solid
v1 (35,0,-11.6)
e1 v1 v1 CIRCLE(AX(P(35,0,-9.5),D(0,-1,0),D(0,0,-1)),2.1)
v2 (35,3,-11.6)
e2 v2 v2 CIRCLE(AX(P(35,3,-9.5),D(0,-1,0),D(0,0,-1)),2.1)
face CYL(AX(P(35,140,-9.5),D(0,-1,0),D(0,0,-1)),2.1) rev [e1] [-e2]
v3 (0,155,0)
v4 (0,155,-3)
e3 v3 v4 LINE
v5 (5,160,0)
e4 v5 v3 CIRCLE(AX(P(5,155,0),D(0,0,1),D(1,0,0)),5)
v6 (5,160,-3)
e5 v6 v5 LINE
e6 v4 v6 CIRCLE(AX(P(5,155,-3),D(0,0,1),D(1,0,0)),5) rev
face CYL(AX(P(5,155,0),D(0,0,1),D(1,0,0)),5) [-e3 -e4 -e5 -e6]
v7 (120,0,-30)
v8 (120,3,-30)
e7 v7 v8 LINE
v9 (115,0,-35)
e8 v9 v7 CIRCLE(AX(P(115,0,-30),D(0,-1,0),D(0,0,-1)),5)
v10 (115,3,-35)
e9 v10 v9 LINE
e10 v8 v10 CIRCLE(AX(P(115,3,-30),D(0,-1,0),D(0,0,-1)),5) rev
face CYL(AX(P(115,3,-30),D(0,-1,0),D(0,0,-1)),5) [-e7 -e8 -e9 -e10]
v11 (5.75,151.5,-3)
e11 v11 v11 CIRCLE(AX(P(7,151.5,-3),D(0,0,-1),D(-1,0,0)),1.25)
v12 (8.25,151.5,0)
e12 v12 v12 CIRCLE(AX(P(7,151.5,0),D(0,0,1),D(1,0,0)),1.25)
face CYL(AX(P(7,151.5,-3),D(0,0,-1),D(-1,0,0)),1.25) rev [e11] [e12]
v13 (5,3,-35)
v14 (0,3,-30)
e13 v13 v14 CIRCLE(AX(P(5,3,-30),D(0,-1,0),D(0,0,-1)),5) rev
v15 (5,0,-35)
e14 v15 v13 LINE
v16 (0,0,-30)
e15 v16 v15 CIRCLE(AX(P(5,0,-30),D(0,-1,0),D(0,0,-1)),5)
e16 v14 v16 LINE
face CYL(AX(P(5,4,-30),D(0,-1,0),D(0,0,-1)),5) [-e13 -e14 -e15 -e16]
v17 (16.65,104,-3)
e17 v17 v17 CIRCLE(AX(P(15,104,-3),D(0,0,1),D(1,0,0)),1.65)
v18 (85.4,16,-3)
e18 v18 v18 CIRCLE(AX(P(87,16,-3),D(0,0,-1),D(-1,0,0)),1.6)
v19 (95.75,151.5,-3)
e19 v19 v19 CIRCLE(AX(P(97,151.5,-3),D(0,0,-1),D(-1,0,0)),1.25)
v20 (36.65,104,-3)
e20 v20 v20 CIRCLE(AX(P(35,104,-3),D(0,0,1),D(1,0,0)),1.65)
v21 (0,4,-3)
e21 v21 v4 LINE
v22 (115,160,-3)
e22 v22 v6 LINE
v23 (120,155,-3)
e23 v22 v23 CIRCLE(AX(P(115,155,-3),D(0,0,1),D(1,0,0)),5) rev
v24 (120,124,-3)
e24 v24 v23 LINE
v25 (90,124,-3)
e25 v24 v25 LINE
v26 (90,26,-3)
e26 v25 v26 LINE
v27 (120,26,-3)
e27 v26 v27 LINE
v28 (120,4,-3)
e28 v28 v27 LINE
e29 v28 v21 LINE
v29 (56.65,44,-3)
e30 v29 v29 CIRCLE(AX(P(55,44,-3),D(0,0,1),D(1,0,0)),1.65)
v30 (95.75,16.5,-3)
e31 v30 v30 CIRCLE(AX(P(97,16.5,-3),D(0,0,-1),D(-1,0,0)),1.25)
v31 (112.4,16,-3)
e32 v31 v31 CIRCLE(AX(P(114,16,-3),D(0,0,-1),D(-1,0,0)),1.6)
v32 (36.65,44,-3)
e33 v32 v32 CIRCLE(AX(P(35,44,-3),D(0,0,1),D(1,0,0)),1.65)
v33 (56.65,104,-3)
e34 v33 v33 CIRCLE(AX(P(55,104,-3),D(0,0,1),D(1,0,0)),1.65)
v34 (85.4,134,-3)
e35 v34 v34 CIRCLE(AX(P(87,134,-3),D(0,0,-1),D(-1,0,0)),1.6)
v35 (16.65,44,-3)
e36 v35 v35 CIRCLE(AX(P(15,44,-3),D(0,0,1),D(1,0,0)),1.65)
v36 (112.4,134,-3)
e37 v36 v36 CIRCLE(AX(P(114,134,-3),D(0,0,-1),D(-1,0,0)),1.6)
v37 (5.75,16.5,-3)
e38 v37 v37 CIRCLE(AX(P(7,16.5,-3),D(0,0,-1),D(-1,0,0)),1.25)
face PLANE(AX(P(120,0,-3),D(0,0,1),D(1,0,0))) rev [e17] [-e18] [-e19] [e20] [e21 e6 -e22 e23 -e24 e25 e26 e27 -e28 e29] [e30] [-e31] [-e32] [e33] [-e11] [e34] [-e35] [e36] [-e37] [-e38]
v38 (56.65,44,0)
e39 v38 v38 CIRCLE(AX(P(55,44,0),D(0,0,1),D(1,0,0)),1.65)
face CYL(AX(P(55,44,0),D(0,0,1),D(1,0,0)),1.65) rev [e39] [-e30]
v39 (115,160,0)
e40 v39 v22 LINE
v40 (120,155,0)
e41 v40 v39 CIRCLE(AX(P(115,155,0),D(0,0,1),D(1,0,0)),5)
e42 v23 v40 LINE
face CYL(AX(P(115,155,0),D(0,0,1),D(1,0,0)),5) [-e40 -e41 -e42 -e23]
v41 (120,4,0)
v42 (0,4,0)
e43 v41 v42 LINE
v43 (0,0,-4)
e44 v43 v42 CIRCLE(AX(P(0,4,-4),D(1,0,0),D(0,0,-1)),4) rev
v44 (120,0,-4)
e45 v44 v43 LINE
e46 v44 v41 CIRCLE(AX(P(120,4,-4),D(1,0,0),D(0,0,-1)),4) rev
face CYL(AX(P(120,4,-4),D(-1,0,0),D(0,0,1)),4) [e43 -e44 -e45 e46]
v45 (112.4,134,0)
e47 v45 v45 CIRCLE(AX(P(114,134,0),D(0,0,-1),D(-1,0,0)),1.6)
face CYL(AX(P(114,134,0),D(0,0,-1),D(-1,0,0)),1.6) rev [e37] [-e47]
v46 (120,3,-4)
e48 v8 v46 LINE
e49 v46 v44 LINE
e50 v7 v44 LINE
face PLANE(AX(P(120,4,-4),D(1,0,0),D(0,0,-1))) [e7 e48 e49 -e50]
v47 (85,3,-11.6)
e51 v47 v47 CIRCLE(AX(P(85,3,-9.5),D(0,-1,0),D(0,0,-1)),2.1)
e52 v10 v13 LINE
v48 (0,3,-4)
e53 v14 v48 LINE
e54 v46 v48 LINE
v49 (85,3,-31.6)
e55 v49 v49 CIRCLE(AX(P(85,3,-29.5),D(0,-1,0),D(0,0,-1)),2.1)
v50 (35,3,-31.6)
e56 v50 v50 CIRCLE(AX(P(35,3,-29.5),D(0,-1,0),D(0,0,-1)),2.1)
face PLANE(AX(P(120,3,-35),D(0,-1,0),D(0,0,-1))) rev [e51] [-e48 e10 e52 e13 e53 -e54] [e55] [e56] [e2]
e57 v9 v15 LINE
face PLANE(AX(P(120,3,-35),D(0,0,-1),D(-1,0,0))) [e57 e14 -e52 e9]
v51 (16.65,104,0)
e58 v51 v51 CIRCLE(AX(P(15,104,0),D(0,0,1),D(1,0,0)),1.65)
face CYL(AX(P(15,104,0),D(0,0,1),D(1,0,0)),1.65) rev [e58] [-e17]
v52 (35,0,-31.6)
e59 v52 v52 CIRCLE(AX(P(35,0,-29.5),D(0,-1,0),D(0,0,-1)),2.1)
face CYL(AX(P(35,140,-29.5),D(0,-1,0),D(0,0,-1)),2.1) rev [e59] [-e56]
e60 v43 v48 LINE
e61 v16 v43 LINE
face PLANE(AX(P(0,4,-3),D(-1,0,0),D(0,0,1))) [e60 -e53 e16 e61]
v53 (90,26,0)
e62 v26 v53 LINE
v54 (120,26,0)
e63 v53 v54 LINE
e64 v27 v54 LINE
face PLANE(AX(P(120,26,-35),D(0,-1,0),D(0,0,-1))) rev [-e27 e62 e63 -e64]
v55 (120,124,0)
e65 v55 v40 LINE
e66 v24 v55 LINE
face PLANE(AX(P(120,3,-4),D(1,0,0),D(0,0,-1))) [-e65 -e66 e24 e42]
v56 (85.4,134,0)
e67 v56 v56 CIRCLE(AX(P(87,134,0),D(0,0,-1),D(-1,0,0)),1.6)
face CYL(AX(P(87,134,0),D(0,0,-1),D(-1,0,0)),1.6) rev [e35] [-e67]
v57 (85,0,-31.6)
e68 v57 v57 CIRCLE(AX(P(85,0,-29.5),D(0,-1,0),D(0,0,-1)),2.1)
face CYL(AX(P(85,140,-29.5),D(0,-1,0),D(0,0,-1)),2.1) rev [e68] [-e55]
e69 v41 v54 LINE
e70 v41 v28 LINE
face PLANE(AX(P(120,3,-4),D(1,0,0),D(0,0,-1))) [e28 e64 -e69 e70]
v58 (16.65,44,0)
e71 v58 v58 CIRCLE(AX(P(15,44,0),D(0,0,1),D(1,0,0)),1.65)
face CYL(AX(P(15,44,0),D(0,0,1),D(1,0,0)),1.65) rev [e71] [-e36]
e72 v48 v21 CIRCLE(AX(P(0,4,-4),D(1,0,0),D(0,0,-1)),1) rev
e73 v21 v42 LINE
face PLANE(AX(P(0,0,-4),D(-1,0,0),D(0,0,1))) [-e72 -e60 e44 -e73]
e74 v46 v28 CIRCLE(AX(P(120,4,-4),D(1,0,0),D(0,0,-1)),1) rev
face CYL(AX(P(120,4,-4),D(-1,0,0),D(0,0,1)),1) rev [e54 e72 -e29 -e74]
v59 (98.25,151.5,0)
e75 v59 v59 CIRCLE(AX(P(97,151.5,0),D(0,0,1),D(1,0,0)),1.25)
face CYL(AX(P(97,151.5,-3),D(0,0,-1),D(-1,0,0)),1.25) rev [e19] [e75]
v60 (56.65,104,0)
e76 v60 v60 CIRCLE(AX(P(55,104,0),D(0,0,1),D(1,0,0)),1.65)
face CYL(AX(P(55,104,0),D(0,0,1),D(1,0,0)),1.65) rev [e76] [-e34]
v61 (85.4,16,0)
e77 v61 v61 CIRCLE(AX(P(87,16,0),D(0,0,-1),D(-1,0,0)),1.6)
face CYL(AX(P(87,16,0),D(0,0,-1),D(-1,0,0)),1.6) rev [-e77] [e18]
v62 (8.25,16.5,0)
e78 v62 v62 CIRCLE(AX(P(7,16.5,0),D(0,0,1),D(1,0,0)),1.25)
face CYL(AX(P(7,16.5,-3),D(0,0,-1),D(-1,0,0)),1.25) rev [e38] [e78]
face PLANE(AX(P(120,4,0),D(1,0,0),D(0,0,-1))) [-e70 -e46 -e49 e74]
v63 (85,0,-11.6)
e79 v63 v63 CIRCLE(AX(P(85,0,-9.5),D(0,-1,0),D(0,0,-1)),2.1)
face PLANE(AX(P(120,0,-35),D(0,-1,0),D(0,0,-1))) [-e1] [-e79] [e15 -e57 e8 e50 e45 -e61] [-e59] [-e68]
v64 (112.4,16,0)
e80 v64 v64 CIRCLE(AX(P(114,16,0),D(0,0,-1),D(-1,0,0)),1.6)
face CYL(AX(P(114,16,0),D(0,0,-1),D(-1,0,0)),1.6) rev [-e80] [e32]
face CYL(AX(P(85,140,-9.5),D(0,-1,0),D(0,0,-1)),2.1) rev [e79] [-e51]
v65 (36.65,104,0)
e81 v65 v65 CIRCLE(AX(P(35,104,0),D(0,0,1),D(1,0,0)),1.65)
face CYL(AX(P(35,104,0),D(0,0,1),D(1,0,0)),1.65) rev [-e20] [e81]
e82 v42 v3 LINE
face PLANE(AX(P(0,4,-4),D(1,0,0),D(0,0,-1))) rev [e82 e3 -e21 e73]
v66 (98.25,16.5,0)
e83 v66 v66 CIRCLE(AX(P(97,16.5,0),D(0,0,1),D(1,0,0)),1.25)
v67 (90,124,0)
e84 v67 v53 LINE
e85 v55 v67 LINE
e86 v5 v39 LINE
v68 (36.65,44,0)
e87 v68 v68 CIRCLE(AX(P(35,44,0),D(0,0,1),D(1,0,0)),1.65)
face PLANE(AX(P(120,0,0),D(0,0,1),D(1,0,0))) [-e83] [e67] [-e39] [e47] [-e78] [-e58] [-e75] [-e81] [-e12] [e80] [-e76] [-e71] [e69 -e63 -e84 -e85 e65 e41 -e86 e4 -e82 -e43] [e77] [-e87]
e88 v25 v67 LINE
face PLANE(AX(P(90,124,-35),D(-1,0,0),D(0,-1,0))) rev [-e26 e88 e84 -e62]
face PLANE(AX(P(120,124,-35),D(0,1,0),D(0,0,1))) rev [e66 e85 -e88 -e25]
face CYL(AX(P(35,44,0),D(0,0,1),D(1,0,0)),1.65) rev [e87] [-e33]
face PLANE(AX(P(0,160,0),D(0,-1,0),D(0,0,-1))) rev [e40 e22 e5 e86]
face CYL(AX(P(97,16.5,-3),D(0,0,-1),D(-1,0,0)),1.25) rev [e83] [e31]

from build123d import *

# Parameters (mm, degrees)
SM_BASE_FLANGE_1_DEPTH      = 120
SKETCH_6_R                  = 1.6
CUT_EXTRUDE_1_DEPTH         = 188.147001045
PATTERN_LINEAR_1_COUNT      = 2
PATTERN_LINEAR_1_PITCH      = 118
PATTERN_LINEAR_1_COUNT_DIR2 = 5
PATTERN_LINEAR_1_PITCH_DIR2 = 27
SKETCH_7_R                  = 2.1
CUT_EXTRUDE_2_DEPTH         = 188.683243791
PATTERN_LINEAR_2_COUNT      = 2
PATTERN_LINEAR_2_PITCH      = 20
PATTERN_LINEAR_2_COUNT_DIR2 = 2
PATTERN_LINEAR_2_PITCH_DIR2 = 50
M4X0_7_TAPPED_HOLE1_D       = 3.3
PATTERN_LINEAR_4_COUNT      = 3
PATTERN_LINEAR_4_PITCH      = 20
PATTERN_LINEAR_4_COUNT_DIR2 = 4
PATTERN_LINEAR_4_PITCH_DIR2 = 20
SKETCH6_W                   = 120
SKETCH6_H                   = 3
BOSS_EXTRUDE1_DEPTH         = 20
SKETCH_11_R                 = 3.02820634
SKETCH_11_R_2               = 2.816705121
EXTRUDE_1_DEPTH             = 3
M3X0_5_1_D                  = 2.5
SKETCH_13_W                 = 30
SKETCH_13_H                 = 98
CUT_EXTRUDE_3_DEPTH         = 204.039405042
FILLET_1_R                  = 5


# Sheet-metal steps are written as plain solids
with BuildPart() as part:
    # Sketch 1 → 基材-凸緣1 (new body)
    with BuildSketch(Plane(origin=(0, 0, 0), x_dir=(0, 0, -1), z_dir=(1, 0, 0))):
        with BuildLine():
            Line((35, 0), (4, 0))
            ThreePointArc((4, 0), (1.171572875, 1.171572875), (0, 4))
            Line((0, 4), (0, 140))
            Line((0, 140), (3, 140))
            Line((3, 140), (3, 4))
            ThreePointArc((3, 4), (3.292893219, 3.292893219), (4, 3))
            Line((4, 3), (35, 3))
            Line((35, 3), (35, 0))
        make_face()
    extrude(amount=SM_BASE_FLANGE_1_DEPTH)

    # 草圖6 → 除料-伸長1 (cut, through all)
    with BuildSketch(Plane(origin=(0, 0, -3), x_dir=(-1, 0, 0), z_dir=(0, 0, -1))):
        with Locations((-6, 134)):
            Circle(SKETCH_6_R)
    cut_extrude_1 = extrude(amount=-CUT_EXTRUDE_1_DEPTH, mode=Mode.SUBTRACT)

    # 直線複製排列1: Cut-Extrude 1 2 × 5, 4 skipped
    with Locations(*[(j * PATTERN_LINEAR_1_PITCH_DIR2, -i * PATTERN_LINEAR_1_PITCH, 0) for i in range(PATTERN_LINEAR_1_COUNT) for j in range(PATTERN_LINEAR_1_COUNT_DIR2) if (i, j) not in ((0, 0), (0, 1), (0, 2), (1, 1), (1, 2))]):
        add(cut_extrude_1, mode=Mode.SUBTRACT)

    # 草圖7 → 除料-伸長2 (cut, through all)
    with BuildSketch(Plane.XZ):
        with Locations(Location((35, -9.5, 0), (0, 0, 270))):
            Circle(SKETCH_7_R)
    cut_extrude_2 = extrude(amount=-CUT_EXTRUDE_2_DEPTH, mode=Mode.SUBTRACT)

    # 直線複製排列2: Cut-Extrude 2 2 × 2
    with Locations(*[(j * PATTERN_LINEAR_2_PITCH_DIR2, 0, -i * PATTERN_LINEAR_2_PITCH) for i in range(PATTERN_LINEAR_2_COUNT) for j in range(PATTERN_LINEAR_2_COUNT_DIR2) if (i, j) != (0, 0)]):
        add(cut_extrude_2, mode=Mode.SUBTRACT)

    # M4x0.7 Tapped Hole1 (through all)
    with Locations(Plane.XY):
        with Locations((15, 104)):
            m4x0_7_tapped_hole1 = Hole(M4X0_7_TAPPED_HOLE1_D / 2)

    # 直線複製排列4: M4x0.7 Tapped Hole1 3 × 4, 6 skipped
    with Locations(*[(i * PATTERN_LINEAR_4_PITCH, -j * PATTERN_LINEAR_4_PITCH_DIR2, 0) for i in range(PATTERN_LINEAR_4_COUNT) for j in range(PATTERN_LINEAR_4_COUNT_DIR2) if (i, j) not in ((0, 0), (0, 1), (0, 2), (1, 1), (1, 2), (2, 1), (2, 2))]):
        add(m4x0_7_tapped_hole1, mode=Mode.SUBTRACT)

    # Sketch6 → Boss-Extrude1 (add)
    with BuildSketch(Plane(origin=(0, 140, 0), x_dir=(1, 0, 0), z_dir=(0, 1, 0))):
        with Locations((60, 1.5)):
            Rectangle(SKETCH6_W, SKETCH6_H)
    extrude(amount=BOSS_EXTRUDE1_DEPTH)

    # 草圖11 → 填料-伸長1 (add)
    with BuildSketch(Plane.XY):
        with Locations((6, 134)):
            Circle(SKETCH_11_R)
        with Locations((6, 16)):
            Circle(SKETCH_11_R_2)
    extrude(amount=-EXTRUDE_1_DEPTH)

    # M3x0.5 螺紋孔1 (through all)
    with Locations(Plane(origin=(97, 151.5, -3), x_dir=(-1, 0, 0), z_dir=(0, 0, -1))):
        with Locations((0, 0), (90, 0), (0, -135), (90, -135)):
            Hole(M3X0_5_1_D / 2)

    # 草圖13 → 除料-伸長3 (cut, through all)
    with BuildSketch(Plane.XY):
        with Locations((105, 75)):
            Rectangle(SKETCH_13_W, SKETCH_13_H)
    extrude(amount=-CUT_EXTRUDE_3_DEPTH, mode=Mode.SUBTRACT)

    # 圓角1
    fillet_1_edges = [part.edges().sort_by_distance(p)[0] for p in [
        (120, 1.5, -35),
        (0, 1.5, -35),
        (0, 160, -1.5),
        (120, 160, -1.5),
    ]]
    fillet(fillet_1_edges, radius=FILLET_1_R)


solid = part.part
